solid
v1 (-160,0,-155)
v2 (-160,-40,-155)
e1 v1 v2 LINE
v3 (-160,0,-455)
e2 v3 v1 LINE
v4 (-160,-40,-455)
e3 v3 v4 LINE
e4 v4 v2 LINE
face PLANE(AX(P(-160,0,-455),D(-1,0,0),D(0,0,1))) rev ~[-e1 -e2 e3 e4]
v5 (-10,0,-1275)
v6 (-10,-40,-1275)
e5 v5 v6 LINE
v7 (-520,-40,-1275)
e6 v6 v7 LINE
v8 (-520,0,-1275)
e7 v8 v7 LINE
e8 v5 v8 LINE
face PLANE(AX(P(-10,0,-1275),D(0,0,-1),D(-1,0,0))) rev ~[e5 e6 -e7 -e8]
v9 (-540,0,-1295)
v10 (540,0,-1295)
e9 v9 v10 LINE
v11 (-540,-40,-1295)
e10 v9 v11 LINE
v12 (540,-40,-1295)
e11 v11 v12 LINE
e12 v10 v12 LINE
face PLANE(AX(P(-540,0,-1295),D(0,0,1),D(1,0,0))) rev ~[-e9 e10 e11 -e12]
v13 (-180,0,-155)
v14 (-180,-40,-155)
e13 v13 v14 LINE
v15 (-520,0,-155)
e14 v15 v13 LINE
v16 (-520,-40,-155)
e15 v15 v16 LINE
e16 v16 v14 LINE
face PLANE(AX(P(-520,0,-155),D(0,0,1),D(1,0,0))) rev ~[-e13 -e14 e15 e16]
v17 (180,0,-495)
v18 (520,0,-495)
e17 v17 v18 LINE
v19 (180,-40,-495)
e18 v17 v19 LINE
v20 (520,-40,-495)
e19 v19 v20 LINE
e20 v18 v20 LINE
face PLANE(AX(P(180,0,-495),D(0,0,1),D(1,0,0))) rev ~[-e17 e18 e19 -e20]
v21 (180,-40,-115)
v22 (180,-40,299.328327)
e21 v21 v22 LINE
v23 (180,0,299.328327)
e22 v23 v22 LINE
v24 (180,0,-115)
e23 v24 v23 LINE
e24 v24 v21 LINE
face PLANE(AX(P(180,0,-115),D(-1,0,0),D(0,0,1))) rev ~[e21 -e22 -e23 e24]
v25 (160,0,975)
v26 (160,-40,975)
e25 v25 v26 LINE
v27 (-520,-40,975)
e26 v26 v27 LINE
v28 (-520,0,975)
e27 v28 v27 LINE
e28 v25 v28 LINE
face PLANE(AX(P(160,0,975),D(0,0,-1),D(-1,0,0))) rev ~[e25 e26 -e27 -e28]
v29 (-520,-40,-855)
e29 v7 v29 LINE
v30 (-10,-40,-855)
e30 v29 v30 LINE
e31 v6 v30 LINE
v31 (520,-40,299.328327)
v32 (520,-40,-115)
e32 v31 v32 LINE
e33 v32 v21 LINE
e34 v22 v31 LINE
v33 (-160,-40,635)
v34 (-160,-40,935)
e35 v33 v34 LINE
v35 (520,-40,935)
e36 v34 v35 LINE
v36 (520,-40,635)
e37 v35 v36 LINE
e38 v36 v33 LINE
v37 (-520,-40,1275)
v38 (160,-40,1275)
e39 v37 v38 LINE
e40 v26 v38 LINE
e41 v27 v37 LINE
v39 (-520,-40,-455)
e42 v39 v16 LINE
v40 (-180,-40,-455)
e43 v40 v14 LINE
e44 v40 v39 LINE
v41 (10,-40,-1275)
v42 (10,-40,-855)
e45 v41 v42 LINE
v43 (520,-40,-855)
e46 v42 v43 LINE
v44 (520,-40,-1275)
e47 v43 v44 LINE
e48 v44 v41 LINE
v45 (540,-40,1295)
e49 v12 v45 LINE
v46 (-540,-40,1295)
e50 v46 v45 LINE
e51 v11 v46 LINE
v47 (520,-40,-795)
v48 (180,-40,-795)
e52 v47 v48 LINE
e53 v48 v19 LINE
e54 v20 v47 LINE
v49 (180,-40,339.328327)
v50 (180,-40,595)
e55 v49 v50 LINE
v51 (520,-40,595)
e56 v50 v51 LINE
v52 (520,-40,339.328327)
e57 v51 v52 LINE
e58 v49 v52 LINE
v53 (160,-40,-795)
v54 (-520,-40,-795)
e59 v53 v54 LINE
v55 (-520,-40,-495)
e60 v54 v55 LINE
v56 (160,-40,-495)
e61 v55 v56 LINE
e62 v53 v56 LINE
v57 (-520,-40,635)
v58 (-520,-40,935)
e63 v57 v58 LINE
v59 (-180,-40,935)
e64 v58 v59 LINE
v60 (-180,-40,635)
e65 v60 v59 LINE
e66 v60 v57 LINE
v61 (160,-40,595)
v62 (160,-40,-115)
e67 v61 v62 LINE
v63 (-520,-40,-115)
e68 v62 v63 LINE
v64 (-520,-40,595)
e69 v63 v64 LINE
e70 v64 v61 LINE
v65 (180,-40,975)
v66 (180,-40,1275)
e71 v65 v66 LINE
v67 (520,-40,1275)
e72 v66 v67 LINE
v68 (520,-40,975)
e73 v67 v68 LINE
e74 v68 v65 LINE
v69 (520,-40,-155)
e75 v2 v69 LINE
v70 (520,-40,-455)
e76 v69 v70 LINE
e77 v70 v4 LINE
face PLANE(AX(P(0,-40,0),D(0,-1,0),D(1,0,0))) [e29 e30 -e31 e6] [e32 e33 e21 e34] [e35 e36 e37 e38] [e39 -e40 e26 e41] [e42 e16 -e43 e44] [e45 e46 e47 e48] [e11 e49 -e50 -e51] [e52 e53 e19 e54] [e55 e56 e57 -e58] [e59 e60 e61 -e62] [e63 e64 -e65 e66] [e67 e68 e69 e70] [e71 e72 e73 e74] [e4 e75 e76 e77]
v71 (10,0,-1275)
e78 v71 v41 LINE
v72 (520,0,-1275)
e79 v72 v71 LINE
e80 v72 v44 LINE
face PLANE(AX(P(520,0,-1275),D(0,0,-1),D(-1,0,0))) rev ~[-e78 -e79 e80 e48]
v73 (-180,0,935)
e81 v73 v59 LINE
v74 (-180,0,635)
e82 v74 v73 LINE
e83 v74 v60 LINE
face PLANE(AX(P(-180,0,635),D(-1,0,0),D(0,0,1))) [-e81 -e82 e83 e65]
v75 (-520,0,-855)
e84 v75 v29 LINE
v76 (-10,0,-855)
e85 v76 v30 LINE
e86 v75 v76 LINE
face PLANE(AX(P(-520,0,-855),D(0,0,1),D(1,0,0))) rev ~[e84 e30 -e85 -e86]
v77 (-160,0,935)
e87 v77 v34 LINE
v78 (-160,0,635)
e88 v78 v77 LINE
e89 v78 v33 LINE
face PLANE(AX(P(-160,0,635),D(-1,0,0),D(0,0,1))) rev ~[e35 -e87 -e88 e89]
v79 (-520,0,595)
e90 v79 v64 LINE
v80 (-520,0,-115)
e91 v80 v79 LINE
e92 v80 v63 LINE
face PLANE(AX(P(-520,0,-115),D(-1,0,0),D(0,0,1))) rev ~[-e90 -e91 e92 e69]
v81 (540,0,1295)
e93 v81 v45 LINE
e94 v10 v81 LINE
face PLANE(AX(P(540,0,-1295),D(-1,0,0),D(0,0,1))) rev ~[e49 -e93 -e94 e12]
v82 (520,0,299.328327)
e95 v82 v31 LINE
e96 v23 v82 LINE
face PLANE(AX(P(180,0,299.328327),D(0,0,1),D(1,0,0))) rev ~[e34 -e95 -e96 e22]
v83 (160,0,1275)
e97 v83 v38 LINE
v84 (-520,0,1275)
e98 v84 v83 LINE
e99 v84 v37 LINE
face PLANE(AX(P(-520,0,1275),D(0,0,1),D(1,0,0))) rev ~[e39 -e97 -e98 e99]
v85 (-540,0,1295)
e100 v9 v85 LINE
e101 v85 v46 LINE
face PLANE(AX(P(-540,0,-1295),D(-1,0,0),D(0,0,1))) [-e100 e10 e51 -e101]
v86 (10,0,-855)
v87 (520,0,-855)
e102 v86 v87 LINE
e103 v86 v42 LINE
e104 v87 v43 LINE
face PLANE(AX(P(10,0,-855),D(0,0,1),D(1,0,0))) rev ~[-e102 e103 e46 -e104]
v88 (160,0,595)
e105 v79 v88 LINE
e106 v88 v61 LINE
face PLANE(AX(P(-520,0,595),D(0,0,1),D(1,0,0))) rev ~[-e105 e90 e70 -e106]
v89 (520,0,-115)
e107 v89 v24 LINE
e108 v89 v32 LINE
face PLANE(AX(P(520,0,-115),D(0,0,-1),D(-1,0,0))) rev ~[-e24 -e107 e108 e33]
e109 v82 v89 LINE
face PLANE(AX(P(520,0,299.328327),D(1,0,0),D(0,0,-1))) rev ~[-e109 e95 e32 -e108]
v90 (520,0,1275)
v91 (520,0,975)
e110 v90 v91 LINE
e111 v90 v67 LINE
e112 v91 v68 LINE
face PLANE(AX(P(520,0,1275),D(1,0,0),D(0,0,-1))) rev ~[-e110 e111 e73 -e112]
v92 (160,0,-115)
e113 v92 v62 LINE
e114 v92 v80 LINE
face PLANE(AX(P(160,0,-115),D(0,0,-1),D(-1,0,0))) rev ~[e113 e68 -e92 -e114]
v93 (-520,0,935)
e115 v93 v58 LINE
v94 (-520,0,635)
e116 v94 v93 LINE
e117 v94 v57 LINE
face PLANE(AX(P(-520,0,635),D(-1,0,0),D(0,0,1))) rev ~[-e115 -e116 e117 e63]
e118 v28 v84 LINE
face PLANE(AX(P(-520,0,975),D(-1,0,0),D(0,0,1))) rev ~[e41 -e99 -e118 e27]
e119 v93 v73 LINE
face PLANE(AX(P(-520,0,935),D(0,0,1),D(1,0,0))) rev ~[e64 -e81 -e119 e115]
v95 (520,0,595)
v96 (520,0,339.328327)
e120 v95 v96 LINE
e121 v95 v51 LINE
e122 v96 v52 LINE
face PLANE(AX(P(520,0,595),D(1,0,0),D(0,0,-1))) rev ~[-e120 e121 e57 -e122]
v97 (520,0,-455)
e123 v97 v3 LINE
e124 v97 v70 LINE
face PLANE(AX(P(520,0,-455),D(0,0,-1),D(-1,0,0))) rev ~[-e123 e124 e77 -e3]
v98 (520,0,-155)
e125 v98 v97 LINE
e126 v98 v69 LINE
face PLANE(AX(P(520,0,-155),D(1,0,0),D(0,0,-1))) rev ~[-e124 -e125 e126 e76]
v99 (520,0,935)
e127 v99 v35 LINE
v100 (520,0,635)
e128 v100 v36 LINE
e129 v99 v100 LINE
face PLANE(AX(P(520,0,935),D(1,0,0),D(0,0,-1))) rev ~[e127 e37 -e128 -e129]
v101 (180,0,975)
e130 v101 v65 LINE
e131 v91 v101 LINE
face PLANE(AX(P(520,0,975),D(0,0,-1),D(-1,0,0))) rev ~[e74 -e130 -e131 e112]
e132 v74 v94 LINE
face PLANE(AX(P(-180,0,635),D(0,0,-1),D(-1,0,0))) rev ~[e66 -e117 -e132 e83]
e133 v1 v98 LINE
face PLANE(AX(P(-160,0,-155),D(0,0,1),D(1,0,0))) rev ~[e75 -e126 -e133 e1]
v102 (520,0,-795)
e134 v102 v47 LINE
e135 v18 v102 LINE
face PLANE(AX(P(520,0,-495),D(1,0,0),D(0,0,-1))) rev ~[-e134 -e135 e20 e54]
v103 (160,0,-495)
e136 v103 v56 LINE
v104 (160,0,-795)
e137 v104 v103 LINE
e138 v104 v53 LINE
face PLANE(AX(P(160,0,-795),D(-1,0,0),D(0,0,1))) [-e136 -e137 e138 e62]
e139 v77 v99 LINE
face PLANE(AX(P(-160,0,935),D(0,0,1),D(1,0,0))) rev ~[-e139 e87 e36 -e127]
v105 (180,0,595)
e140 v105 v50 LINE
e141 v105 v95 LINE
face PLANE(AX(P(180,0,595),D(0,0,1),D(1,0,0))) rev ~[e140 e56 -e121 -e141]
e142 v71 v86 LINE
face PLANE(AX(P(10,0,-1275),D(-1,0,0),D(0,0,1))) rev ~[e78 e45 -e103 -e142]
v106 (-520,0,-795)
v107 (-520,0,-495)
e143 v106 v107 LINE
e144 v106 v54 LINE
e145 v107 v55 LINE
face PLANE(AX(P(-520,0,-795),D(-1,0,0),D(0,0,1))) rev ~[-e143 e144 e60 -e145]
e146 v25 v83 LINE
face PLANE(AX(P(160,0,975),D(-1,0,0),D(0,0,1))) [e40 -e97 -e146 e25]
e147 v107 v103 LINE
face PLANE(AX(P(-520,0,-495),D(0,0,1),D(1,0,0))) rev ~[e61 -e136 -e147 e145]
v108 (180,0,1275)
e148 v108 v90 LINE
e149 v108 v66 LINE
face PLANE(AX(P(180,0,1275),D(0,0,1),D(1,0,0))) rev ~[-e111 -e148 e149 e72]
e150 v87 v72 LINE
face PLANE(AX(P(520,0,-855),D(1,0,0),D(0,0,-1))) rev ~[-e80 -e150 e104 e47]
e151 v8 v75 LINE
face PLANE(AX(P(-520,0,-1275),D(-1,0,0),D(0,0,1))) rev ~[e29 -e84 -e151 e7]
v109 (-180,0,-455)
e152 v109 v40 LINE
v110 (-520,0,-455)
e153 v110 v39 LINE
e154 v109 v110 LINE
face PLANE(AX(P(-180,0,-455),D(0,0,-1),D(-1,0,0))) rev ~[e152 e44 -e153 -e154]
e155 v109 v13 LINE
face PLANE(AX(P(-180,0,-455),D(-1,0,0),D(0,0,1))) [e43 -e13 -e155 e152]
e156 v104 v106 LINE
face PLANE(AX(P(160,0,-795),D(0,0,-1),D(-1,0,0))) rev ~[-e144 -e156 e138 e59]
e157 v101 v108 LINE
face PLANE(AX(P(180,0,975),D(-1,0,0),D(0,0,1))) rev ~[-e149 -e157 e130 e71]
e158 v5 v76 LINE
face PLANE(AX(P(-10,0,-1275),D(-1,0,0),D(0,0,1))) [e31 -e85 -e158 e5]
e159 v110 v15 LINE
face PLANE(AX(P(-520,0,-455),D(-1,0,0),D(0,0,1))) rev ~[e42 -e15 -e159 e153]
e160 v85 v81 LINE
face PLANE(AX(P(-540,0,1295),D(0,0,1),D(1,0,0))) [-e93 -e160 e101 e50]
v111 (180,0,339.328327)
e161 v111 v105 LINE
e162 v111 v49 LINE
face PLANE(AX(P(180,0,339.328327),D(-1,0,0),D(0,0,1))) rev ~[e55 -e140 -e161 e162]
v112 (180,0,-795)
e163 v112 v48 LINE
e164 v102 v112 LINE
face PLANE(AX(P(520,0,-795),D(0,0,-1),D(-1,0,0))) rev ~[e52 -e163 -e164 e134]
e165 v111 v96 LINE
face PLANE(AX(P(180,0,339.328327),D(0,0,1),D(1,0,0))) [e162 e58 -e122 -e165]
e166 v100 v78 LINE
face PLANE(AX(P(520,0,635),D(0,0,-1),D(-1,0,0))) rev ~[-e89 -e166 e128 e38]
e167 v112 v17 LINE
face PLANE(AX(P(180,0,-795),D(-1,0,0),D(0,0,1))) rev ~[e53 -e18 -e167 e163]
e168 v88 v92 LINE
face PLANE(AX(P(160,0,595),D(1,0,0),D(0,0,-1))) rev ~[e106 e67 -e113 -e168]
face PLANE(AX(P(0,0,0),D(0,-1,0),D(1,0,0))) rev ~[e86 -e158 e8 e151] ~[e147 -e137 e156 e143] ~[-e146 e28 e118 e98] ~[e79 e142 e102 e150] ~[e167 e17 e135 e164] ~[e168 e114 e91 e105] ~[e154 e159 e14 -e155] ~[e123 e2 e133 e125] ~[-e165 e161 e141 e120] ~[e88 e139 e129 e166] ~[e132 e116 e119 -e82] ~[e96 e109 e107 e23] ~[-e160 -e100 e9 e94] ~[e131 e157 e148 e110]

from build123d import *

# Parameters (mm, degrees)
F0_W     = 1080
F0_H     = 2590
F0_W_2   = 20
F0_H_2   = 300
F0_W_3   = 340
F0_H_3   = 40
F0_H_4   = 420
F1_DEPTH = 40


# Not quite as in the source:
# - a feature names something its author has since deleted; it is built from what else it names


with BuildPart() as f1:
    # F0 (on Front) → F1 (new body)
    with BuildSketch(Plane.XZ):
        Rectangle(F0_W, F0_H)
        Polygon((520, -855), (520, -1275), (10, -1275), (-10, -1275), (-520, -1275), (-520, -855), (-520, -795), (-520, -495), (-520, -455), (-520, -155), (-520, -115), (-520, 595), (-520, 635), (-520, 935), (-520, 975), (-520, 1275), (160, 1275), (180, 1275), (520, 1275), (520, 975), (520, 935), (520, 635), (520, 595), (520, 339.328327179), (520, 299.328327179), (520, -115), (520, -155), (520, -455), (520, -495), (520, -795), align=None, mode=Mode.SUBTRACT)
        with Locations((170, 1125)):
            Rectangle(F0_W_2, F0_H_2)
        Polygon((-160, 935), (520, 935), (520, 975), (180, 975), (160, 975), (-520, 975), (-520, 935), (-180, 935), align=None)
        with Locations((-170, 785)):
            Rectangle(F0_W_2, F0_H_2)
        Polygon((180, 595), (520, 595), (520, 635), (-160, 635), (-180, 635), (-520, 635), (-520, 595), (160, 595), align=None)
        Polygon((160, -115), (180, -115), (180, 299.328327179), (180, 339.328327179), (180, 595), (160, 595), (160, 80), (160, 40), align=None)
        with Locations((350, 319.328327179)):
            Rectangle(F0_W_3, F0_H_3)
        Polygon((-160, -155), (520, -155), (520, -115), (180, -115), (160, -115), (-520, -115), (-520, -155), (-180, -155), align=None)
        with Locations((-170, -305)):
            Rectangle(F0_W_2, F0_H_2)
        Polygon((180, -495), (520, -495), (520, -455), (-160, -455), (-180, -455), (-520, -455), (-520, -495), (160, -495), align=None)
        with Locations((170, -645)):
            Rectangle(F0_W_2, F0_H_2)
        Polygon((10, -855), (520, -855), (520, -795), (180, -795), (160, -795), (-520, -795), (-520, -855), (-10, -855), align=None)
        with Locations((0, -1065)):
            Rectangle(F0_W_2, F0_H_4)
    extrude(amount=F1_DEPTH)


solid = f1.part
